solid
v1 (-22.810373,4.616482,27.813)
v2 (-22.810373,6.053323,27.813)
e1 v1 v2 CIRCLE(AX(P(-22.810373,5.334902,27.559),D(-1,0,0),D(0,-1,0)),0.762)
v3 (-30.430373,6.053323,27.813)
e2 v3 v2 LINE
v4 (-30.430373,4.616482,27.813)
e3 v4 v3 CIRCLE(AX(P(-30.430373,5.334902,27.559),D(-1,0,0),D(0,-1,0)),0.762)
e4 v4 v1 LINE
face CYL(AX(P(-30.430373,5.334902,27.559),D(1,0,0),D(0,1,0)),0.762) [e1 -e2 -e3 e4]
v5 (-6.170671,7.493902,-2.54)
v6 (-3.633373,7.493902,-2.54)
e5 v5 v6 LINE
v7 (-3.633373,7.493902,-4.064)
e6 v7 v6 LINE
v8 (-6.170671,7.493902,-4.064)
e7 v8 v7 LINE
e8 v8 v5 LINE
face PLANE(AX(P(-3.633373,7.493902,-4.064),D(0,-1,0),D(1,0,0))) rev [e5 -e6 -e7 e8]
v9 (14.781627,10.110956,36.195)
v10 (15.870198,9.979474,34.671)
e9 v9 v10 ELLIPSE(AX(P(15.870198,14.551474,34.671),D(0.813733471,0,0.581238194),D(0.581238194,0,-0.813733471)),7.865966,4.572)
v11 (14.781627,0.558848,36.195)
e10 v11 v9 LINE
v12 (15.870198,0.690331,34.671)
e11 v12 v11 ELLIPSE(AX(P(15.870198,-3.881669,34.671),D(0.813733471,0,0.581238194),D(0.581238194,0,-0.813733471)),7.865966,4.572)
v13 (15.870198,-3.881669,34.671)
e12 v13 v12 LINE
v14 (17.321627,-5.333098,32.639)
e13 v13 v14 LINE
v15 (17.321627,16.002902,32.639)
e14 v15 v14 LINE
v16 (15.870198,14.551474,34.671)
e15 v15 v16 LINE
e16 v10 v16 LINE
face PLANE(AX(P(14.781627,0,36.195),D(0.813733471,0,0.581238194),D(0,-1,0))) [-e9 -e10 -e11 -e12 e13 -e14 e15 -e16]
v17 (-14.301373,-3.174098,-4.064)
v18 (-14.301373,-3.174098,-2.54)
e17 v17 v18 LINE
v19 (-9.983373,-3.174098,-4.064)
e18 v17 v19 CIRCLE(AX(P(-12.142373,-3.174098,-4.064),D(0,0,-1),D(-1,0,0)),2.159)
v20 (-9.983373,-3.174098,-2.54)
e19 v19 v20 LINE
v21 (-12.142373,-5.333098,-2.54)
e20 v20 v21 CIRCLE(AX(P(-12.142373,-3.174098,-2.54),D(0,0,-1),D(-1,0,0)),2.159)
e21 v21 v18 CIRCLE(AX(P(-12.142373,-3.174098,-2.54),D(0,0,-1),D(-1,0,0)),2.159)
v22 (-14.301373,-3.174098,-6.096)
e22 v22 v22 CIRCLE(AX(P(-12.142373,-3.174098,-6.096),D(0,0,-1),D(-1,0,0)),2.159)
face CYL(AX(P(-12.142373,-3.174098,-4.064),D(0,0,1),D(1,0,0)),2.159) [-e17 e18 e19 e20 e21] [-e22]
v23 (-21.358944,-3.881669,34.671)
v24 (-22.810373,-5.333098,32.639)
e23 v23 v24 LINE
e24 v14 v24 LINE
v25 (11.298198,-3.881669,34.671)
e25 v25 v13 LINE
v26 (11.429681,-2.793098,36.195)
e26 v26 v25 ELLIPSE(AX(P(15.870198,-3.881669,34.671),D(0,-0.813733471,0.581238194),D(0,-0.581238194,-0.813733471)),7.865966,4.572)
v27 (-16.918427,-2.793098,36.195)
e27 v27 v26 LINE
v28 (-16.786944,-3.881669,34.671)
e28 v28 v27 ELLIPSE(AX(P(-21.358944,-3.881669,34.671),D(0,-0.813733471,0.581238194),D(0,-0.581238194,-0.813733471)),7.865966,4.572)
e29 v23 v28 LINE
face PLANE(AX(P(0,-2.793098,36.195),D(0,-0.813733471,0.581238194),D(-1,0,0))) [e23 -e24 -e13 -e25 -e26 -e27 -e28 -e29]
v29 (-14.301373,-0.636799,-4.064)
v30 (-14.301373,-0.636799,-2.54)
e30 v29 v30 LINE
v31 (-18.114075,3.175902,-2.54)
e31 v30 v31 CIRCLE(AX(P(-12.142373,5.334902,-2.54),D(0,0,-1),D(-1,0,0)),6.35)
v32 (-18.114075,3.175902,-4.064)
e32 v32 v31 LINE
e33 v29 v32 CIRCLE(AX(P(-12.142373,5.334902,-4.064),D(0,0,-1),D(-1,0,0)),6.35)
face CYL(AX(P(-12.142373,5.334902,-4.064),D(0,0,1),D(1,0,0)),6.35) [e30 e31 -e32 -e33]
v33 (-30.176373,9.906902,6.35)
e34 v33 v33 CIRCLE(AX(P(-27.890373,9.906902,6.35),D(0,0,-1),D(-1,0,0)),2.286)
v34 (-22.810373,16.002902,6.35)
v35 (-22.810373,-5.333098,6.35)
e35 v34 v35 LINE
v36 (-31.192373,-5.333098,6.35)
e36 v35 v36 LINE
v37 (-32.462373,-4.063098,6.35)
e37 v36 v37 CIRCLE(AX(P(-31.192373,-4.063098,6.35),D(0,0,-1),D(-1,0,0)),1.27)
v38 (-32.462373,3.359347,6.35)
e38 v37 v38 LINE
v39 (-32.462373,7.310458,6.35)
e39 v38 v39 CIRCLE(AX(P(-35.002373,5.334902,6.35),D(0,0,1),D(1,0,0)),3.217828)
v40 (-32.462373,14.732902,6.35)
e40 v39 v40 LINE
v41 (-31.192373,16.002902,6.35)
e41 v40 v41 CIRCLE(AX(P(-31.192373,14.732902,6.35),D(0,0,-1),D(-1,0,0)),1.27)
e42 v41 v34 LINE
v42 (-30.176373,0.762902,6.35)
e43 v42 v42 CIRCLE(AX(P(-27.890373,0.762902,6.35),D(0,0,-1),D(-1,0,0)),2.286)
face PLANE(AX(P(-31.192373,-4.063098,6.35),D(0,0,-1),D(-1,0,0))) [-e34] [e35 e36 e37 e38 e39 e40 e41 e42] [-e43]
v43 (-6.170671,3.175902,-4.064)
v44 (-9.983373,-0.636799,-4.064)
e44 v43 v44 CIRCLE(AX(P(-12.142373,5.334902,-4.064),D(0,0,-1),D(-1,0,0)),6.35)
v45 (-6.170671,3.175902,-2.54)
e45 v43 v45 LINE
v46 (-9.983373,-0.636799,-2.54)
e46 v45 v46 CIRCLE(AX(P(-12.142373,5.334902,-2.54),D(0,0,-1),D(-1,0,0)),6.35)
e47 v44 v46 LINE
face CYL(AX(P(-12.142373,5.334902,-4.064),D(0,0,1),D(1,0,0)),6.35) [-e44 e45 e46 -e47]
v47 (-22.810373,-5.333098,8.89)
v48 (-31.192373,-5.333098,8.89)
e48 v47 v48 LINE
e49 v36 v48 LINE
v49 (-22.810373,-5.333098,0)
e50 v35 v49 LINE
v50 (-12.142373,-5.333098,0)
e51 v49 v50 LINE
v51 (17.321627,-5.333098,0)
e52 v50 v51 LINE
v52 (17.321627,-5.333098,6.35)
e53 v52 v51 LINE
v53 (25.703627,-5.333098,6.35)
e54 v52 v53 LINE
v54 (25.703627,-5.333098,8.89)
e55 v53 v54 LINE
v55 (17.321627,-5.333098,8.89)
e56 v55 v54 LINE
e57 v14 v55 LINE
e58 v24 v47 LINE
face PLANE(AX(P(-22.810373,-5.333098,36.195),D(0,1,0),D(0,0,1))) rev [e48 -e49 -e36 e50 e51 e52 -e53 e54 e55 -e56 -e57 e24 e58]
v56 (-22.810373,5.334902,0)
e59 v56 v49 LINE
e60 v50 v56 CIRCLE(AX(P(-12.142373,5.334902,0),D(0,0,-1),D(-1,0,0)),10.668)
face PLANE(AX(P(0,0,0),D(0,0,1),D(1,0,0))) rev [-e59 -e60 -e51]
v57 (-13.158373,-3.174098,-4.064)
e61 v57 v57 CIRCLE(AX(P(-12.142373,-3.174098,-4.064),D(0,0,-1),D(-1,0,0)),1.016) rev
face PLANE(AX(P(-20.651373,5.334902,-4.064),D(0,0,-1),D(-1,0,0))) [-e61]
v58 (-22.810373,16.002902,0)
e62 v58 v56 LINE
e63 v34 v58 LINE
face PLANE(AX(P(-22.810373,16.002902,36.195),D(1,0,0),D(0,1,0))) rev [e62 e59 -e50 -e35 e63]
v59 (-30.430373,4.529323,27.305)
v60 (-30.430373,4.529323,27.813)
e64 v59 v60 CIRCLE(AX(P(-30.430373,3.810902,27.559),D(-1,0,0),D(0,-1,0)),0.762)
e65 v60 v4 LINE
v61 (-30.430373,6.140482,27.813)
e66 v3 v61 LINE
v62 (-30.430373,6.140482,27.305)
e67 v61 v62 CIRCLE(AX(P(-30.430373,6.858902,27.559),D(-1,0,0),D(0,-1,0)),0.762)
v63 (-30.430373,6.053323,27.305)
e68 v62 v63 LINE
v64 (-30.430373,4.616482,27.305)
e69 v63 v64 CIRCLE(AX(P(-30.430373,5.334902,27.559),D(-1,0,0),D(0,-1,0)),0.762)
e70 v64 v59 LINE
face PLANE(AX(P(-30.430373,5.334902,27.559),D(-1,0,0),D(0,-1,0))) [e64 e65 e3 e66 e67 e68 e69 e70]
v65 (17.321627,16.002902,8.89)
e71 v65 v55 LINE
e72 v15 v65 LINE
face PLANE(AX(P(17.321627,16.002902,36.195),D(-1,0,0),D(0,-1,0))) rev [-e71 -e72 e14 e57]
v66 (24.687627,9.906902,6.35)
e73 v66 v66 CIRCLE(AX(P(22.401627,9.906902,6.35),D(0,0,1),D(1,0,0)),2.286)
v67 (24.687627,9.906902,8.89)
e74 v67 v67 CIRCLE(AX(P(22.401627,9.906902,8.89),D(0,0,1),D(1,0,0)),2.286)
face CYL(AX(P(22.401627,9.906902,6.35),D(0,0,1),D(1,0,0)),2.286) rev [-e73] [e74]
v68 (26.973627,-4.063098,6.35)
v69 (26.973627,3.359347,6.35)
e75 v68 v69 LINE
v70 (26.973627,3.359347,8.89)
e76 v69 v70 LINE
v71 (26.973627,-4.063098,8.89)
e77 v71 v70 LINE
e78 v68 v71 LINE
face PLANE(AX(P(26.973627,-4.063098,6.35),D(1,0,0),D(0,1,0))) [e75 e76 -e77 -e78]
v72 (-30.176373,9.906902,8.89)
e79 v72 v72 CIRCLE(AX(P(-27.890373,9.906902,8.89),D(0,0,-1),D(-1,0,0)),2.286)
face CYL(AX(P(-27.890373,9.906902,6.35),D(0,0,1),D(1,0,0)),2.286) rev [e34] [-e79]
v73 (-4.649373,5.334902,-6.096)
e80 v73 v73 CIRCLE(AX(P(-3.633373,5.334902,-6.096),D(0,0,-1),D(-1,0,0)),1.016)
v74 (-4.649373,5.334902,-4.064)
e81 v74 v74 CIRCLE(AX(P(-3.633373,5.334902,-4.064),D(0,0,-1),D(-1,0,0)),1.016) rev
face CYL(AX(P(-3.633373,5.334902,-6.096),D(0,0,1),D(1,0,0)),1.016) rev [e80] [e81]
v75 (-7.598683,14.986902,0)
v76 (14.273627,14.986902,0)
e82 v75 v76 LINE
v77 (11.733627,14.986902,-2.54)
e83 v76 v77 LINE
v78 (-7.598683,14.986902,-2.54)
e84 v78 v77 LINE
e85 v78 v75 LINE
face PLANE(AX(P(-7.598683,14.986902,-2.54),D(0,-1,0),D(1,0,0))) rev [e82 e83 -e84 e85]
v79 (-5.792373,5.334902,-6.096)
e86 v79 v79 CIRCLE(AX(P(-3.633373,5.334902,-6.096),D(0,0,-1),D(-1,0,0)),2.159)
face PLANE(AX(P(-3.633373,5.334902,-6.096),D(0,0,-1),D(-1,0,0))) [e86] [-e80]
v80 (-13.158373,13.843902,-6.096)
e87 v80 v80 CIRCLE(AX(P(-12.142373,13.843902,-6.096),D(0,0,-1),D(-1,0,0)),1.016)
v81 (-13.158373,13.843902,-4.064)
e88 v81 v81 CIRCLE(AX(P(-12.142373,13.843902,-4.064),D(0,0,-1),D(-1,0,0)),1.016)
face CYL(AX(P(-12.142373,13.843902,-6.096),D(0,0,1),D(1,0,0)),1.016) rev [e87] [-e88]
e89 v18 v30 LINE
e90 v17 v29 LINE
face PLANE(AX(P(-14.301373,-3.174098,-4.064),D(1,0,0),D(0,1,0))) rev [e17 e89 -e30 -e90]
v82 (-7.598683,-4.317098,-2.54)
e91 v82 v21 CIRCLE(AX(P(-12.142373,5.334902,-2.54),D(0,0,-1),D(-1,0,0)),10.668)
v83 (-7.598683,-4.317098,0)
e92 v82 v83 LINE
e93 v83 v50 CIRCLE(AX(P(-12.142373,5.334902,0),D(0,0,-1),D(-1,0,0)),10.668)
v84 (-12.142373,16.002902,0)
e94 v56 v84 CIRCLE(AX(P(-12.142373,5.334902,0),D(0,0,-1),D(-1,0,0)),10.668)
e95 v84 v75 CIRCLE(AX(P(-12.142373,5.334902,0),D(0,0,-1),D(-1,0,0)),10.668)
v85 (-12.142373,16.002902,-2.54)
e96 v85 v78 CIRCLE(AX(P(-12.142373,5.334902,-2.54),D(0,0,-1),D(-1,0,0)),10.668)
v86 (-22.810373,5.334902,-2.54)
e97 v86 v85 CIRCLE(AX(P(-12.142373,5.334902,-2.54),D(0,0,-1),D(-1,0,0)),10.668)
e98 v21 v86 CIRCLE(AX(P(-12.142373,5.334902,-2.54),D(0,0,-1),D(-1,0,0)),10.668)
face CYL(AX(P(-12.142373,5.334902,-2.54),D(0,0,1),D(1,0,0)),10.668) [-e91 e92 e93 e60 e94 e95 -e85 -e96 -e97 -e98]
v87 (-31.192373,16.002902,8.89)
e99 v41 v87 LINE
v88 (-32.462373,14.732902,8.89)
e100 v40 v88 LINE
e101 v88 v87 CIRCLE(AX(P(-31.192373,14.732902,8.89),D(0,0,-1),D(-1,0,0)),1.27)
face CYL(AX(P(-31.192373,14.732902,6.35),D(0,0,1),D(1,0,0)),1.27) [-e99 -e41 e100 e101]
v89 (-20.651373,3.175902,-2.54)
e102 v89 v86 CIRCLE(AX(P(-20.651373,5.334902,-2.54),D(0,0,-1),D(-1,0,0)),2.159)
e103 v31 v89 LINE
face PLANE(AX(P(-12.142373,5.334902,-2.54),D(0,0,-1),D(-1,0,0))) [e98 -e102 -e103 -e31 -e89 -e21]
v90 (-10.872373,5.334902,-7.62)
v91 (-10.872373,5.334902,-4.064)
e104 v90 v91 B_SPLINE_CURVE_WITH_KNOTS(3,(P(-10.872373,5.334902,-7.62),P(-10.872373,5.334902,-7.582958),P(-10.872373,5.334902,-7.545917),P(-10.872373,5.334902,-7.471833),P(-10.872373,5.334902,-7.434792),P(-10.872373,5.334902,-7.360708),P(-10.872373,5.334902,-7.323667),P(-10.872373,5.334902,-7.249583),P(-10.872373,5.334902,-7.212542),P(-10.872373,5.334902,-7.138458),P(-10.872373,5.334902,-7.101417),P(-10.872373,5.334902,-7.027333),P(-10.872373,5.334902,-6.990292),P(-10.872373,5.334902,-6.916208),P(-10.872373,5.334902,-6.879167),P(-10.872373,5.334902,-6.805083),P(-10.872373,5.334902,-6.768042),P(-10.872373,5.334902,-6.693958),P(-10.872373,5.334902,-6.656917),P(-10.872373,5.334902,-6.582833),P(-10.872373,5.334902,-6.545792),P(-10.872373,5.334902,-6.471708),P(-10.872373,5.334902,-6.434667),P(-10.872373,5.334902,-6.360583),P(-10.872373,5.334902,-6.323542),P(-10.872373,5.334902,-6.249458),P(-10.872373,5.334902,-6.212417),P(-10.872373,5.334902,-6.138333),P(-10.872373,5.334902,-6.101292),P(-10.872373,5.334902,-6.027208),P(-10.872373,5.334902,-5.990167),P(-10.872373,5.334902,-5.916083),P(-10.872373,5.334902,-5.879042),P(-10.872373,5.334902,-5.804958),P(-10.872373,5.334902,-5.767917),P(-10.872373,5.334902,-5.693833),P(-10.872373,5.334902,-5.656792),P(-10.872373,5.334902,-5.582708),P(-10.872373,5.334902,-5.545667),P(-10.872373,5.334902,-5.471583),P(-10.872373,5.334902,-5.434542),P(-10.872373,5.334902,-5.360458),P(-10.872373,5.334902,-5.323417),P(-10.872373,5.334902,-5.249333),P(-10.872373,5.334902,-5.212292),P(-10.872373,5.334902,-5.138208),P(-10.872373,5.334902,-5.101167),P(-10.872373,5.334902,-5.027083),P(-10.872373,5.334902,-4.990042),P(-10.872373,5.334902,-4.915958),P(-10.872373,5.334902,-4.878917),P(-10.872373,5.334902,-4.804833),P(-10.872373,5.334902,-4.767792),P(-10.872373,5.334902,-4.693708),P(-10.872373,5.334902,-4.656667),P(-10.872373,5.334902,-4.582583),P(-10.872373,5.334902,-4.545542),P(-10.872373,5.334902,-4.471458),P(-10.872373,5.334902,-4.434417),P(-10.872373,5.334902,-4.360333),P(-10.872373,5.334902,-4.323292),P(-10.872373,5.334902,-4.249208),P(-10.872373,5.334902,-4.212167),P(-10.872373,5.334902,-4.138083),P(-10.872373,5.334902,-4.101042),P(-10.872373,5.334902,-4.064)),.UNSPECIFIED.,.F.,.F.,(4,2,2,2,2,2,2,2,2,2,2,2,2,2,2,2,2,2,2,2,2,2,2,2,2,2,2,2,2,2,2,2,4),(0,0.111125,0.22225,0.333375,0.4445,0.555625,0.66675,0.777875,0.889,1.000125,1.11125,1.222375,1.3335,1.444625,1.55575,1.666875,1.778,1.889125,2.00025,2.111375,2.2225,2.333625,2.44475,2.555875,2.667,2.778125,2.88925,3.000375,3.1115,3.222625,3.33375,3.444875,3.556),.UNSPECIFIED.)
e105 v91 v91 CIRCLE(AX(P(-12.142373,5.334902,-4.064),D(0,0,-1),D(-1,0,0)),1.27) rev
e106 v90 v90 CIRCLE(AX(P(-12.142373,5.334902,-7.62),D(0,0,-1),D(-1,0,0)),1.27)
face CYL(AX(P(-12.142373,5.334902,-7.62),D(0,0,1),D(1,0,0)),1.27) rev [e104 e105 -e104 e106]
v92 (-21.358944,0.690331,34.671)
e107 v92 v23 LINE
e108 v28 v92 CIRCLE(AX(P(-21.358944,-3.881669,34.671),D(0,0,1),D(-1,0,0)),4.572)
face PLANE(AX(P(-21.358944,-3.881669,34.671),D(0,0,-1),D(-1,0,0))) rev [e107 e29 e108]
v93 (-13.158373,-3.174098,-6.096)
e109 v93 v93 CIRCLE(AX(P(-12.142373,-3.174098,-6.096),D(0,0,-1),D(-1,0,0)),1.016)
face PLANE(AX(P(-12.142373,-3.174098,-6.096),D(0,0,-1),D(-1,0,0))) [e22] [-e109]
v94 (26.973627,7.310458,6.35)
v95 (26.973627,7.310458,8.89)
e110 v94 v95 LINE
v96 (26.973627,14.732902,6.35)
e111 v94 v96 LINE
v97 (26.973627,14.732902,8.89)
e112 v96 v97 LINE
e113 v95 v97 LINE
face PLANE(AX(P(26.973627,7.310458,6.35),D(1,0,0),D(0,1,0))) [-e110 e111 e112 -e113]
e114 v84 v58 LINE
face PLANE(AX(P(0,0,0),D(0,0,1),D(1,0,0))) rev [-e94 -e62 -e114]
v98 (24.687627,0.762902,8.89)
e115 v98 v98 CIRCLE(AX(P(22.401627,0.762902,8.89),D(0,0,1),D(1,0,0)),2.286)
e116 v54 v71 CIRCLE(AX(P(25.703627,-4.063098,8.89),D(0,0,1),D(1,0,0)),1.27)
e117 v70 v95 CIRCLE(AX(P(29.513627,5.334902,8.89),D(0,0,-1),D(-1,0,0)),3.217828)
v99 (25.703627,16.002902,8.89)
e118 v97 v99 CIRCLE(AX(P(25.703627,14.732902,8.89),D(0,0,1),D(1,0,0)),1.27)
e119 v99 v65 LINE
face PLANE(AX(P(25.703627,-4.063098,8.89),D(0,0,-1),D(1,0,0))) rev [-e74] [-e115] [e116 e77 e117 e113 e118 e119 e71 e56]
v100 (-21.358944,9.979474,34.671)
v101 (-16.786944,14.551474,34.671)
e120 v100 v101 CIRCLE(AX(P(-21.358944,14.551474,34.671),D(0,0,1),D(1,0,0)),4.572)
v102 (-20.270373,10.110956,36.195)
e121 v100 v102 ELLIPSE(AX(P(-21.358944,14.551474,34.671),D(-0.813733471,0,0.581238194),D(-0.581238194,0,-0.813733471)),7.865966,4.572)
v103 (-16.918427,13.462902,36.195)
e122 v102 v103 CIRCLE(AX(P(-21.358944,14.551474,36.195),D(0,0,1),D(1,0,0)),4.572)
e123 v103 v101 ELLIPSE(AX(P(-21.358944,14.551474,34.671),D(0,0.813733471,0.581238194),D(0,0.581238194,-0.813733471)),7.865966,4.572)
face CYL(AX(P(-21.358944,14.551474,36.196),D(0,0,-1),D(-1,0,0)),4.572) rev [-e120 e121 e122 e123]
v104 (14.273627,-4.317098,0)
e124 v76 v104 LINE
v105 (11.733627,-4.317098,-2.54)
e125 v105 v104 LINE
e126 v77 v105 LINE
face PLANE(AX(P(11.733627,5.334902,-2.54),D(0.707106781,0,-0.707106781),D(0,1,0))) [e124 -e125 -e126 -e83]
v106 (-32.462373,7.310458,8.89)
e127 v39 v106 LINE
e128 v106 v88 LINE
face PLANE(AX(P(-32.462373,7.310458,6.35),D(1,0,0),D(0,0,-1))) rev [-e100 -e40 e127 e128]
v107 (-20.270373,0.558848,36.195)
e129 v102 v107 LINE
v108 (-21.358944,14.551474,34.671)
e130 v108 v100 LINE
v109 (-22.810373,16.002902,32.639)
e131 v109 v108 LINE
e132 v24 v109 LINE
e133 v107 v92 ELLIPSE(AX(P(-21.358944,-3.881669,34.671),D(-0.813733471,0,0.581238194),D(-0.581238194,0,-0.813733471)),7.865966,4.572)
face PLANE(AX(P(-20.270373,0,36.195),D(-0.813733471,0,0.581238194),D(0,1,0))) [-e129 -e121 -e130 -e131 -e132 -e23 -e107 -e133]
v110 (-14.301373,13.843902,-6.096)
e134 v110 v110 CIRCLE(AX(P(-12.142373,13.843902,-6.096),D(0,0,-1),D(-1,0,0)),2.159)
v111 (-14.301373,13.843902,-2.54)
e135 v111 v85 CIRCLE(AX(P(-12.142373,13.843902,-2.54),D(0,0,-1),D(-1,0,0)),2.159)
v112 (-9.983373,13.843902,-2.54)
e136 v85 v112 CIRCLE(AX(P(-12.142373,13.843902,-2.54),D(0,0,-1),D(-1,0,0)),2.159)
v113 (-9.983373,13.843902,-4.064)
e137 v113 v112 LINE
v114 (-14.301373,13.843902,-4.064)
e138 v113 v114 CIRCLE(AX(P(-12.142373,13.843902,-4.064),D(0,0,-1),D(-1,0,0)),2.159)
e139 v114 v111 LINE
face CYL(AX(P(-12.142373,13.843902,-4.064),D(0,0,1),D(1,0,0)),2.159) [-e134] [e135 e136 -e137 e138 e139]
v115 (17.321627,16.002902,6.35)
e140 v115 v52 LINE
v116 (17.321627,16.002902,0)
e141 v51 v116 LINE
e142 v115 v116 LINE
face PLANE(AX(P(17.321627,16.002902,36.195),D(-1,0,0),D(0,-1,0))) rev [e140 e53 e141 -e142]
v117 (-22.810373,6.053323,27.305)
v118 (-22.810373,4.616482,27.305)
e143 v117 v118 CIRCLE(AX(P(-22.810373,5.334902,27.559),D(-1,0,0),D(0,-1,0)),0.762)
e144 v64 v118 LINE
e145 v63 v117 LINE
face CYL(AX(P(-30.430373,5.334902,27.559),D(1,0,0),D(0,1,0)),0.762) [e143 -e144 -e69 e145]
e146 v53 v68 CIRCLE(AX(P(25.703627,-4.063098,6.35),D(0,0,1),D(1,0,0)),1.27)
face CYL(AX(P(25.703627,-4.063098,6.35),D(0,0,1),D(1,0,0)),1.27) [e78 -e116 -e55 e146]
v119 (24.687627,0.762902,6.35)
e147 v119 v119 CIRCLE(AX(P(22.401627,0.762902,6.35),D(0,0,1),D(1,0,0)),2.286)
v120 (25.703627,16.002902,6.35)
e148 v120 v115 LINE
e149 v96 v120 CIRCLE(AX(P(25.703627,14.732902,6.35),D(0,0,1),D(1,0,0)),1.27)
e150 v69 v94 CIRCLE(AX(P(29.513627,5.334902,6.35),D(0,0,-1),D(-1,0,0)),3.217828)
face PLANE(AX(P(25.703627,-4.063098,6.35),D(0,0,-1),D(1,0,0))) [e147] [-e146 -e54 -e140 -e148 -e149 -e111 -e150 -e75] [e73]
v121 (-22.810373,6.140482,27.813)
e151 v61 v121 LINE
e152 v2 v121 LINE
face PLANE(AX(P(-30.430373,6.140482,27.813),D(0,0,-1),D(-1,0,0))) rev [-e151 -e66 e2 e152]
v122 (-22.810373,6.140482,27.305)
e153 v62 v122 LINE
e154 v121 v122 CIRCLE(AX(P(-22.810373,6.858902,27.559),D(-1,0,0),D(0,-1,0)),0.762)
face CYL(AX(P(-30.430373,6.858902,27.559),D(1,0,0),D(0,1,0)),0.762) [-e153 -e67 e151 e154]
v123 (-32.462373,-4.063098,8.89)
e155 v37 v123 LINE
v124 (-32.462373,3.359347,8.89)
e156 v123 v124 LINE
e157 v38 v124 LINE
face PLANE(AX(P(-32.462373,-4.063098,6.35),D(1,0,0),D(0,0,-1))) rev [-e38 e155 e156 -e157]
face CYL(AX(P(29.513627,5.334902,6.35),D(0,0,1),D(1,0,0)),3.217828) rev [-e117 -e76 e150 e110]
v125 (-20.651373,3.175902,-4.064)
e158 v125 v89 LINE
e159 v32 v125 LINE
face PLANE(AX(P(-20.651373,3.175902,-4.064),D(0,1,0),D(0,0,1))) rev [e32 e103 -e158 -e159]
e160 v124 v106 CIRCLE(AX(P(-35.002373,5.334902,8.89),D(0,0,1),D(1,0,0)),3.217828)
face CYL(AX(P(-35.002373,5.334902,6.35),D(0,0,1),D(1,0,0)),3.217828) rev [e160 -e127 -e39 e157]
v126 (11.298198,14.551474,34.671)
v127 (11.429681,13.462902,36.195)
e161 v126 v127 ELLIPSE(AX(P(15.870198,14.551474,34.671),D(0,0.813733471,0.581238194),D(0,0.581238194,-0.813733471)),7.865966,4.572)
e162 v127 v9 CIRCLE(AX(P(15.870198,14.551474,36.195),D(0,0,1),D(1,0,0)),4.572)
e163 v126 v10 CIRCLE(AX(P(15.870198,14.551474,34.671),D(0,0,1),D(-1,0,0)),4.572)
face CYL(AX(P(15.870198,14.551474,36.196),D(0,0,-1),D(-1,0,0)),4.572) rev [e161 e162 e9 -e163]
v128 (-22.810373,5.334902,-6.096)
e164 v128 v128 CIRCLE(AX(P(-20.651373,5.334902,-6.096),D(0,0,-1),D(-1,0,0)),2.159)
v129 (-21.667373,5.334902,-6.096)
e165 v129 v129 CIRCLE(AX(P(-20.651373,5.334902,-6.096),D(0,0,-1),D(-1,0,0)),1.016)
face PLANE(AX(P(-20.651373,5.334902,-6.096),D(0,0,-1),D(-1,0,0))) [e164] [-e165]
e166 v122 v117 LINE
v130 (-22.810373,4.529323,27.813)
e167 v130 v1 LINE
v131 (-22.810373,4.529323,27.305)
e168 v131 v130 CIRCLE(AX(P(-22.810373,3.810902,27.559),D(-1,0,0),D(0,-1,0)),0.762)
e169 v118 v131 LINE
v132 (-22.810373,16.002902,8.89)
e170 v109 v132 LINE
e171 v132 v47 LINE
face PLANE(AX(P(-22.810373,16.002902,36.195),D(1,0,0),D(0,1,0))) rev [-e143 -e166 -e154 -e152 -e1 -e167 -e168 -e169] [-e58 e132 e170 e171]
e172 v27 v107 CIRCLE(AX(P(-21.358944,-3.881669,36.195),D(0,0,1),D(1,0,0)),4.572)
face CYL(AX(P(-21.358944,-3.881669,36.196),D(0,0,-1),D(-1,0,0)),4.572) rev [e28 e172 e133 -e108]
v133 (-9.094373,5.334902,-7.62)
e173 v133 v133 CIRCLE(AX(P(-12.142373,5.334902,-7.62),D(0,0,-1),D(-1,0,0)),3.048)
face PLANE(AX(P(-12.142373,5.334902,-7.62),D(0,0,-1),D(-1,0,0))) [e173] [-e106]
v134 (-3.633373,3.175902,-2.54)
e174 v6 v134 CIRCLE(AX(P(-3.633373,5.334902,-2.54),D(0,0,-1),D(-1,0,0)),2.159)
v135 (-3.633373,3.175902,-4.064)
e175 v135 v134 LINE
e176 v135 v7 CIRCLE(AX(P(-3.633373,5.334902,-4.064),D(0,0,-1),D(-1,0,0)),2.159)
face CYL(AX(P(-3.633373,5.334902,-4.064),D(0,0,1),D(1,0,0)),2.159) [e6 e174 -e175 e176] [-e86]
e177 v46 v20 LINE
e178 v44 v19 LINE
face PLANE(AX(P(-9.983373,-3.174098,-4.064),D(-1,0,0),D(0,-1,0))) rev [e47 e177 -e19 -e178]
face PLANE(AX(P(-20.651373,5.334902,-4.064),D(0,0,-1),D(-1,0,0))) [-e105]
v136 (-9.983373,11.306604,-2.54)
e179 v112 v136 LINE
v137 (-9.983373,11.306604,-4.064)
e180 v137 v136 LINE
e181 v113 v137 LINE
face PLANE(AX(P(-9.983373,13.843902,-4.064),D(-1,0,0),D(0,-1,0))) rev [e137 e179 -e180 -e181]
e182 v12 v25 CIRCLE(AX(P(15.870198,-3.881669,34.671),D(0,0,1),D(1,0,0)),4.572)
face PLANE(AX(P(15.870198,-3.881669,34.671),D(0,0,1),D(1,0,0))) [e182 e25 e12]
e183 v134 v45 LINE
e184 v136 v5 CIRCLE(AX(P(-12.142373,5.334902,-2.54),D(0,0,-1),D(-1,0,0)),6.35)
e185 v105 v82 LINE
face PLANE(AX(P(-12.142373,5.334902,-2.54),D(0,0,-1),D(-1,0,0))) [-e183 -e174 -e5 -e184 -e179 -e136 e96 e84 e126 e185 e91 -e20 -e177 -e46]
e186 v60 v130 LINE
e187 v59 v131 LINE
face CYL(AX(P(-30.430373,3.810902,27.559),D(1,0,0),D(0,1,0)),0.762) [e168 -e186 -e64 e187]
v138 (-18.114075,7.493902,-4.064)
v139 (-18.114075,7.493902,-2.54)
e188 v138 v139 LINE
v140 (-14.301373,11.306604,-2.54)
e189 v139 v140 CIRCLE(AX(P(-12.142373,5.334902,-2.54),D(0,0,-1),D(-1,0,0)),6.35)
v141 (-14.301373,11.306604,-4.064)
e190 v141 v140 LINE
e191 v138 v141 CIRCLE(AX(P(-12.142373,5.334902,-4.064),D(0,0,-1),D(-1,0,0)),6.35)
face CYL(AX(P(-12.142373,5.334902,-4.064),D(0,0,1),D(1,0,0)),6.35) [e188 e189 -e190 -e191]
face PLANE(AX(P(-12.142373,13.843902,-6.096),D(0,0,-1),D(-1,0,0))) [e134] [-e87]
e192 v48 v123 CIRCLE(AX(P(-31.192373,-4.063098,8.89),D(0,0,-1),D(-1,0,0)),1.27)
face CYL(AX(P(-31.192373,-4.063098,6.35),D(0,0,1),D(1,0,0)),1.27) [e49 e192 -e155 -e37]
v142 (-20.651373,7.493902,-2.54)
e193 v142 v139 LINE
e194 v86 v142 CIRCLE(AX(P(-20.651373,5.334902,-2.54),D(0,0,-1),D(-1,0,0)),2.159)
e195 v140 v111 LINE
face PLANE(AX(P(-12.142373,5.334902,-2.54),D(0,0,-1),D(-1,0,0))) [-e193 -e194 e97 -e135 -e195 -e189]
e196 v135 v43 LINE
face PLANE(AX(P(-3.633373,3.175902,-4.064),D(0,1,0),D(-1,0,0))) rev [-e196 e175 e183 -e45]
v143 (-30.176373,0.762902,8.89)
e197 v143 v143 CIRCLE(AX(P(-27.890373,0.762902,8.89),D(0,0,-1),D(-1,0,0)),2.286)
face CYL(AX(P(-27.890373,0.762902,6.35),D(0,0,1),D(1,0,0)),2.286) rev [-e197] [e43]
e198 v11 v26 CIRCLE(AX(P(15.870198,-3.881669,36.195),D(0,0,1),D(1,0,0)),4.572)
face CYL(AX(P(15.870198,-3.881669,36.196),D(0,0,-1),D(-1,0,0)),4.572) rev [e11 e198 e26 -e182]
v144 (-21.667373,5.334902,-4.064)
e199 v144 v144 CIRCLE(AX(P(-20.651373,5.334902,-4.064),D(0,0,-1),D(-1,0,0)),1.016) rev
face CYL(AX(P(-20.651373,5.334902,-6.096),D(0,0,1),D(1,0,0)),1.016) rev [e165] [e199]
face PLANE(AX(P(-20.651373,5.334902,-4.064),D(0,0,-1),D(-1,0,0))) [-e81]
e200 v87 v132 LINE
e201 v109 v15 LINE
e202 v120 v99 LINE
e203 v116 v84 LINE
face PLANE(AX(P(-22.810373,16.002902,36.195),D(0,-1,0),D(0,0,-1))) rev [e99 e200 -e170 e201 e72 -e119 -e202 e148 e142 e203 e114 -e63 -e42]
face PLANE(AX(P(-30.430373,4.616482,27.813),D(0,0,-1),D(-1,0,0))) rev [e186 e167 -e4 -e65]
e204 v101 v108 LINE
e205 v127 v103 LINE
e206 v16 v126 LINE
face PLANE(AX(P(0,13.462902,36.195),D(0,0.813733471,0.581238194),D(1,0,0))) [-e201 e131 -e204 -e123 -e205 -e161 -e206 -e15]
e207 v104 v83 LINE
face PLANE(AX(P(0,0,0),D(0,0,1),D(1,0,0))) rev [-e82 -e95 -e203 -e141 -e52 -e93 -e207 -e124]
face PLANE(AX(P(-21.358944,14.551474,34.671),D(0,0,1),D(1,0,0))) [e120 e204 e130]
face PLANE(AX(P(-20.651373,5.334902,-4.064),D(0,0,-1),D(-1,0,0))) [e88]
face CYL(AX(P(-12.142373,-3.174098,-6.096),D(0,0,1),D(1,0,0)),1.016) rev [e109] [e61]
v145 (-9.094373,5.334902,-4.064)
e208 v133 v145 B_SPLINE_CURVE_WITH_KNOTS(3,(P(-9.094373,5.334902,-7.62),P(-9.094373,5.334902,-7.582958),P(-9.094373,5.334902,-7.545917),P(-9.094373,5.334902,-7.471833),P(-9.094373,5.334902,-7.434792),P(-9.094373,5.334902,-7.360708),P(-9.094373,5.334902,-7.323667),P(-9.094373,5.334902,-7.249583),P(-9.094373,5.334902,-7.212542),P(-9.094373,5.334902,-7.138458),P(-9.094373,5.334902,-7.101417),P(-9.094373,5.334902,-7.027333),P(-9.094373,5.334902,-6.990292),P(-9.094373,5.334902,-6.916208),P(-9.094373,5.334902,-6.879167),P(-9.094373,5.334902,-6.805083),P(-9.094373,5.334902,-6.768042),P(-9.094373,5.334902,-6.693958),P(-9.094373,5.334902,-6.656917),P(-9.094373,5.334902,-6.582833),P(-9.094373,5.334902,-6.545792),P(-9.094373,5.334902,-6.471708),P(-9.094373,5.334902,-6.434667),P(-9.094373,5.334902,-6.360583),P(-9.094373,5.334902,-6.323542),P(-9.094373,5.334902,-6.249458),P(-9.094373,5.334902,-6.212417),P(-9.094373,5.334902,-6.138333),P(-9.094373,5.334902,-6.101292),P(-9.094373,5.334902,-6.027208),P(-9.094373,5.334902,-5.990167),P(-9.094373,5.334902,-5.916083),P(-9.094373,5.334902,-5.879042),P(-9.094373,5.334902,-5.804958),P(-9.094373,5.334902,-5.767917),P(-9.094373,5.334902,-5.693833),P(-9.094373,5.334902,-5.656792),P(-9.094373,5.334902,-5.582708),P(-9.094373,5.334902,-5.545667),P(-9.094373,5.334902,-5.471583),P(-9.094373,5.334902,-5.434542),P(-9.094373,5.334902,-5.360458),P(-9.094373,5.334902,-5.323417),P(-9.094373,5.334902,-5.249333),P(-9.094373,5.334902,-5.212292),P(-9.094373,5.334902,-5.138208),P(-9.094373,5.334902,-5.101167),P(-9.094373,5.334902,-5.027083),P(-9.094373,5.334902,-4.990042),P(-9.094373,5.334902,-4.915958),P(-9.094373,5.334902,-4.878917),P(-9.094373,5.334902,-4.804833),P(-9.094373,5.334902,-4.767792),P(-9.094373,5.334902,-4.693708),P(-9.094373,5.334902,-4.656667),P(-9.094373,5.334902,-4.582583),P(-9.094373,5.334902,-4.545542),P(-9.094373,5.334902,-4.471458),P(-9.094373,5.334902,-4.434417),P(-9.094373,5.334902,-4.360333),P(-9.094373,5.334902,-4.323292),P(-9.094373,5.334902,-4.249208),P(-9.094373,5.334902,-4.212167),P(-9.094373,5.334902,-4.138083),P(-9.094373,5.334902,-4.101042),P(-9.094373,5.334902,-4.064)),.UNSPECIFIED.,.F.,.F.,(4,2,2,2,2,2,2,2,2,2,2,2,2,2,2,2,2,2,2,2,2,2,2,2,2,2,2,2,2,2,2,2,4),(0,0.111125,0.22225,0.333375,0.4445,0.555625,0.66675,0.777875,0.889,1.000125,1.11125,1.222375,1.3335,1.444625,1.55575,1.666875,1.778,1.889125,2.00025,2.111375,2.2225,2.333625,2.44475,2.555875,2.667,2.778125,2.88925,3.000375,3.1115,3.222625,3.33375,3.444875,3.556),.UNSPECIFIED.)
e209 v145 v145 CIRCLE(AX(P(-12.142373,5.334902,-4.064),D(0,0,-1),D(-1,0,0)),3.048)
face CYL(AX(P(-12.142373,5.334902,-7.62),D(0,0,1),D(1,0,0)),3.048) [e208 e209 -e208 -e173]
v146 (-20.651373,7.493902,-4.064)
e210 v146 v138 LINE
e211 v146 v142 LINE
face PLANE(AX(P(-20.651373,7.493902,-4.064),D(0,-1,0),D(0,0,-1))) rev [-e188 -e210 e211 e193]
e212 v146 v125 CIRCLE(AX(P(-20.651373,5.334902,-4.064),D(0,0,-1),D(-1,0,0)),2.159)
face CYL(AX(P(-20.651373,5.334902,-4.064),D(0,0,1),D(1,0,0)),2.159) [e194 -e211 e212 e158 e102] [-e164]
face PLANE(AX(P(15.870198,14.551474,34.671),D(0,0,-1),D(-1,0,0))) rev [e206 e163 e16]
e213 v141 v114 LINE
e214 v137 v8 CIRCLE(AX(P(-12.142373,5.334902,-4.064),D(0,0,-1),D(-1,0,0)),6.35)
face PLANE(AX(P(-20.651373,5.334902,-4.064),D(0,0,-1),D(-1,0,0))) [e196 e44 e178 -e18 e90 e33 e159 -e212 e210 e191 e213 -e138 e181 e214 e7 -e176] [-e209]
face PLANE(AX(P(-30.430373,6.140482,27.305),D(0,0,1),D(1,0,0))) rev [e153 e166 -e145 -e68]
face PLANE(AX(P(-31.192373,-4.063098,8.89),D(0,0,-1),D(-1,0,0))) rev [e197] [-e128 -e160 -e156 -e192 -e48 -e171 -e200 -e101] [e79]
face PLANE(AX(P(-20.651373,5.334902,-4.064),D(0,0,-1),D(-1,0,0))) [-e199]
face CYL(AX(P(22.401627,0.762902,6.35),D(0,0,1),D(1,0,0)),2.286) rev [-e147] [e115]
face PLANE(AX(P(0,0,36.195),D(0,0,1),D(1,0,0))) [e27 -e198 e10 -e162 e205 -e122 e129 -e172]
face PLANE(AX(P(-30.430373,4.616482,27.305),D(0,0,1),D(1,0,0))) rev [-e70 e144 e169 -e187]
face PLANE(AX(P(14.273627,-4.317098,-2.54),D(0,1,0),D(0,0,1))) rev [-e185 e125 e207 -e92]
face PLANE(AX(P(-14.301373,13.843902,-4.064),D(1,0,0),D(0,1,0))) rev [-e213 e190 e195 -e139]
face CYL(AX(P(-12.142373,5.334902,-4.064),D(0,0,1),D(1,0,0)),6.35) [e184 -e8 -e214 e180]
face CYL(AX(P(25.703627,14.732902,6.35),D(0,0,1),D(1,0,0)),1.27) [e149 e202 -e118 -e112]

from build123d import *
from OCP.BRepFilletAPI import BRepFilletAPI_MakeChamfer

# Parameters (mm, degrees)
SKETCH1_W           = 40.132
SKETCH1_H           = 21.336
BOSS_EXTRUDE1_DEPTH = 36.195
BOSS_EXTRUDE3_DEPTH = 2.54
CHAMFER1_SIZE       = 2.54
SKETCH7_R           = 2.286
BOSS_EXTRUDE4_DEPTH = 2.54
CHAMFER2_SIZE       = 3.556
CHAMFER2_SIZE2      = 2.54
CUT_EXTRUDE11_REACH = 53.909
BOSS_EXTRUDE5_DEPTH = 1.524
SKETCH14_R          = 2.159
SKETCH14_R_2        = 1.016
BOSS_EXTRUDE6_DEPTH = 2.032
SKETCH15_R          = 3.048
SKETCH15_R_2        = 1.27
BOSS_EXTRUDE7_DEPTH = 3.556
BOSS_EXTRUDE8_DEPTH = 7.62


with BuildPart() as part:
    # Sketch1 → Boss-Extrude1 (new body)
    with BuildSketch(Plane.XY):
        with Locations((-2.744373002, 5.334902309)):
            Rectangle(SKETCH1_W, SKETCH1_H)
    extrude(amount=BOSS_EXTRUDE1_DEPTH)

    # Sketch6 → Boss-Extrude3 (add)
    with BuildSketch(Plane(origin=(0, 0, 0), x_dir=(-1, 0, 0), z_dir=(0, 0, -1))):
        with BuildLine():
            Line((7.598682871, 14.986902309), (-14.273626998, 14.986902309))
            Line((-14.273626998, 14.986902309), (-14.273626998, -4.317097691))
            Line((-14.273626998, -4.317097691), (7.598682871, -4.317097691))
            ThreePointArc((7.598682871, -4.317097691), (22.810373002, 5.334902309), (7.598682871, 14.986902309))
        make_face()
    extrude(amount=BOSS_EXTRUDE3_DEPTH)

    # Chamfer1
    chamfer1_edges = [part.edges().sort_by_distance(p)[0] for p in [
        (14.273626998, 5.334902309, -2.54),
    ]]
    chamfer(chamfer1_edges, length=CHAMFER1_SIZE - 0.0001)  # a hair under: the kernel refuses the full size

    # Sketch7 → Boss-Extrude4 (add)
    with BuildSketch(Plane(origin=(0, 0, 8.89), x_dir=(-1, 0, 0), z_dir=(0, 0, -1))):
        with BuildLine():
            Line((22.810373002, 16.002902309), (22.810373002, -5.333097691))
            Line((22.810373002, -5.333097691), (31.192373002, -5.333097691))
            ThreePointArc((31.192373002, -5.333097691), (32.090398614, -4.961123303), (32.462373002, -4.063097691))
            Line((32.462373002, -4.063097691), (32.462373002, 3.359346754))
            ThreePointArc((32.462373002, 3.359346754), (31.78454458, 5.334902309), (32.462373002, 7.310457865))
            Line((32.462373002, 7.310457865), (32.462373002, 14.732902309))
            ThreePointArc((32.462373002, 14.732902309), (32.090398614, 15.630927921), (31.192373002, 16.002902309))
            Line((31.192373002, 16.002902309), (22.810373002, 16.002902309))
        make_face()
        with Locations((27.890373002, 0.762902309)):
            Circle(SKETCH7_R, mode=Mode.SUBTRACT)
        with Locations((27.890373002, 9.906902309)):
            Circle(SKETCH7_R, mode=Mode.SUBTRACT)
    boss_extrude4 = extrude(amount=BOSS_EXTRUDE4_DEPTH)

    # Mirror1: Boss-Extrude4 across plane
    add(boss_extrude4.mirror(Plane(origin=(-2.744373002, 0, 0), x_dir=(0, 0, 1), z_dir=(1, 0, 0))))

    # Chamfer2: one chamfer whose edges measure the first distance from different faces: ONE call of the kernel's chamfer builder (chamfer() names one face for all edges)
    chamfer2_edges_1 = [part.edges().sort_by_distance(p)[0] for p in [
        (17.321626998, 5.334902309, 36.195),
    ]]
    chamfer2_side_1 = [part.faces().sort_by_distance(p)[0] for p in [
        (17.321626998, 5.334902309, 22.5425),
    ]]
    chamfer2_edges_2 = [part.edges().sort_by_distance(p)[0] for p in [
        (-2.744373002, 16.002902309, 36.195),
    ]]
    chamfer2_side_2 = [part.faces().sort_by_distance(p)[0] for p in [
        (-2.744373002, 16.002902309, 17.79911165),
    ]]
    chamfer2_edges_3 = [part.edges().sort_by_distance(p)[0] for p in [
        (-2.744373002, -5.333097691, 36.195),
    ]]
    chamfer2_side_3 = [part.faces().sort_by_distance(p)[0] for p in [
        (-2.744373002, -5.333097691, 17.79911165),
    ]]
    chamfer2_edges_4 = [part.edges().sort_by_distance(p)[0] for p in [
        (-22.810373002, 5.334902309, 36.195),
    ]]
    chamfer2_side_4 = [part.faces().sort_by_distance(p)[0] for p in [
        (-22.810373002, 5.334902309, 22.5425),
    ]]
    chamfer2 = BRepFilletAPI_MakeChamfer(part.part.solid().wrapped)
    for e in chamfer2_edges_1:
        chamfer2.Add(CHAMFER2_SIZE, CHAMFER2_SIZE2, e.wrapped, chamfer2_side_1[0].wrapped)  # the first distance lies on this face
    for e in chamfer2_edges_2:
        chamfer2.Add(CHAMFER2_SIZE, CHAMFER2_SIZE2, e.wrapped, chamfer2_side_2[0].wrapped)  # the first distance lies on this face
    for e in chamfer2_edges_3:
        chamfer2.Add(CHAMFER2_SIZE, CHAMFER2_SIZE2, e.wrapped, chamfer2_side_3[0].wrapped)  # the first distance lies on this face
    for e in chamfer2_edges_4:
        chamfer2.Add(CHAMFER2_SIZE, CHAMFER2_SIZE2, e.wrapped, chamfer2_side_4[0].wrapped)  # the first distance lies on this face
    add(Compound.cast(chamfer2.Shape()), mode=Mode.REPLACE)

    # Sketch12 → Cut-Extrude11 (cut, up to next)
    with BuildSketch(Plane.XY.offset(34.671), mode=Mode.PRIVATE) as cut_extrude11_sk1:
        with BuildLine():
            Line((-21.35894443, 14.551473738), (-21.35894443, 9.979473738))
            ThreePointArc((-21.35894443, 9.979473738), (-18.126052227, 11.318581534), (-16.78694443, 14.551473738))
            Line((-16.78694443, 14.551473738), (-21.35894443, 14.551473738))
        make_face()
    cut_extrude11_tool1 = extrude(cut_extrude11_sk1.sketch, amount=CUT_EXTRUDE11_REACH, mode=Mode.PRIVATE) & part.part
    # Sketch12 → Cut-Extrude11 (cut, up to next)
    with BuildSketch(Plane.XY.offset(34.671), mode=Mode.PRIVATE) as cut_extrude11_sk2:
        with BuildLine():
            Line((15.870198427, 14.551473738), (11.298198427, 14.551473738))
            ThreePointArc((11.298198427, 14.551473738), (12.637306223, 11.318581534), (15.870198427, 9.979473738))
            Line((15.870198427, 9.979473738), (15.870198427, 14.551473738))
        make_face()
    cut_extrude11_tool2 = extrude(cut_extrude11_sk2.sketch, amount=CUT_EXTRUDE11_REACH, mode=Mode.PRIVATE) & part.part
    # Sketch12 → Cut-Extrude11 (cut, up to next)
    with BuildSketch(Plane.XY.offset(34.671), mode=Mode.PRIVATE) as cut_extrude11_sk3:
        with BuildLine():
            Line((15.870198427, -3.88166912), (15.870198427, 0.69033088))
            ThreePointArc((15.870198427, 0.69033088), (12.637306223, -0.648776916), (11.298198427, -3.88166912))
            Line((11.298198427, -3.88166912), (15.870198427, -3.88166912))
        make_face()
    cut_extrude11_tool3 = extrude(cut_extrude11_sk3.sketch, amount=CUT_EXTRUDE11_REACH, mode=Mode.PRIVATE) & part.part
    # Sketch12 → Cut-Extrude11 (cut, up to next)
    with BuildSketch(Plane.XY.offset(34.671), mode=Mode.PRIVATE) as cut_extrude11_sk4:
        with BuildLine():
            Line((-21.35894443, -3.88166912), (-16.78694443, -3.88166912))
            ThreePointArc((-16.78694443, -3.88166912), (-18.126052227, -0.648776916), (-21.35894443, 0.69033088))
            Line((-21.35894443, 0.69033088), (-21.35894443, -3.88166912))
        make_face()
    cut_extrude11_tool4 = extrude(cut_extrude11_sk4.sketch, amount=CUT_EXTRUDE11_REACH, mode=Mode.PRIVATE) & part.part
    add(cut_extrude11_tool1.solids().sort_by_distance((-19.418527, 12.611057, 34.671))[0], mode=Mode.SUBTRACT)
    add(cut_extrude11_tool2.solids().sort_by_distance((13.929781, 12.611057, 34.671))[0], mode=Mode.SUBTRACT)
    add(cut_extrude11_tool3.solids().sort_by_distance((13.929781, -1.941252, 34.671))[0], mode=Mode.SUBTRACT)
    add(cut_extrude11_tool4.solids().sort_by_distance((-19.418527, -1.941252, 34.671))[0], mode=Mode.SUBTRACT)

    # Sketch13 → Boss-Extrude5 (add)
    with BuildSketch(Plane(origin=(0, 0, -2.54), x_dir=(-1, 0, 0), z_dir=(0, 0, -1))):
        with BuildLine():
            Line((20.651373002, 7.493902309), (18.114074518, 7.493902309))
            ThreePointArc((18.114074518, 7.493902309), (16.632501062, 9.82503037), (14.301373002, 11.306603825))
            Line((14.301373002, 11.306603825), (14.301373002, 13.843902309))
            ThreePointArc((14.301373002, 13.843902309), (12.142373002, 16.002902309), (9.983373002, 13.843902309))
            Line((9.983373002, 13.843902309), (9.983373002, 11.306603825))
            ThreePointArc((9.983373002, 11.306603825), (7.652244941, 9.82503037), (6.170671485, 7.493902309))
            Line((6.170671485, 7.493902309), (3.633373002, 7.493902309))
            ThreePointArc((3.633373002, 7.493902309), (1.474373002, 5.334902309), (3.633373002, 3.175902309))
            Line((3.633373002, 3.175902309), (6.170671485, 3.175902309))
            ThreePointArc((6.170671485, 3.175902309), (7.652244941, 0.844774249), (9.983373002, -0.636799207))
            Line((9.983373002, -0.636799207), (9.983373002, -3.174097691))
            ThreePointArc((9.983373002, -3.174097691), (12.142373002, -5.333097691), (14.301373002, -3.174097691))
            Line((14.301373002, -3.174097691), (14.301373002, -0.636799207))
            ThreePointArc((14.301373002, -0.636799207), (16.632501062, 0.844774249), (18.114074518, 3.175902309))
            Line((18.114074518, 3.175902309), (20.651373002, 3.175902309))
            ThreePointArc((20.651373002, 3.175902309), (22.810373002, 5.334902309), (20.651373002, 7.493902309))
        make_face()
    extrude(amount=BOSS_EXTRUDE5_DEPTH)

    # Sketch14 → Boss-Extrude6 (add)
    # profile 1 of 4: a face of its own
    with BuildSketch(Plane(origin=(0, 0, -4.064), x_dir=(-1, 0, 0), z_dir=(0, 0, -1))):
        with Locations((12.142373002, 13.843902309)):
            Circle(SKETCH14_R)
        with Locations((12.142373002, 13.843902309)):
            Circle(SKETCH14_R_2, mode=Mode.SUBTRACT)
    # profile 2 of 4: a face of its own
    with BuildSketch(Plane(origin=(0, 0, -4.064), x_dir=(-1, 0, 0), z_dir=(0, 0, -1))):
        with Locations((20.651373002, 5.334902309)):
            Circle(SKETCH14_R)
        with Locations((20.651373002, 5.334902309)):
            Circle(SKETCH14_R_2, mode=Mode.SUBTRACT)
    # profile 3 of 4: a face of its own
    with BuildSketch(Plane(origin=(0, 0, -4.064), x_dir=(-1, 0, 0), z_dir=(0, 0, -1))):
        with Locations((12.142373002, -3.174097691)):
            Circle(SKETCH14_R)
        with Locations((12.142373002, -3.174097691)):
            Circle(SKETCH14_R_2, mode=Mode.SUBTRACT)
    # profile 4 of 4: a face of its own
    with BuildSketch(Plane(origin=(0, 0, -4.064), x_dir=(-1, 0, 0), z_dir=(0, 0, -1))):
        with Locations(Location((3.633373002, 5.334902309, 0), (0, 0, 90))):
            Circle(SKETCH14_R)
        with Locations((3.633373002, 5.334902309)):
            Circle(SKETCH14_R_2, mode=Mode.SUBTRACT)
    extrude(amount=BOSS_EXTRUDE6_DEPTH)

    # Sketch15 → Boss-Extrude7 (add)
    with BuildSketch(Plane(origin=(0, 0, -4.064), x_dir=(-1, 0, 0), z_dir=(0, 0, -1))):
        with Locations(Location((12.142373002, 5.334902309, 0), (0, 0, 180))):
            Circle(SKETCH15_R)
        with Locations(Location((12.142373002, 5.334902309, 0), (0, 0, 180))):
            Circle(SKETCH15_R_2, mode=Mode.SUBTRACT)
    extrude(amount=BOSS_EXTRUDE7_DEPTH)

    # Sketch16 → Boss-Extrude8 (add)
    with BuildSketch(Plane.ZY.offset(22.810373002)):
        with BuildLine():
            Line((27.813, 4.616481819), (27.813, 4.529322799))
            ThreePointArc((27.813, 4.529322799), (27.559, 3.048902309), (27.305, 4.529322799))
            Line((27.305, 4.529322799), (27.305, 4.616481819))
            ThreePointArc((27.305, 4.616481819), (26.797, 5.334902309), (27.305, 6.053322799))
            Line((27.305, 6.053322799), (27.305, 6.140481819))
            ThreePointArc((27.305, 6.140481819), (27.559, 7.620902309), (27.813, 6.140481819))
            Line((27.813, 6.140481819), (27.813, 6.053322799))
            ThreePointArc((27.813, 6.053322799), (28.321, 5.334902309), (27.813, 4.616481819))
        make_face()
    extrude(amount=BOSS_EXTRUDE8_DEPTH)


solid = part.part
